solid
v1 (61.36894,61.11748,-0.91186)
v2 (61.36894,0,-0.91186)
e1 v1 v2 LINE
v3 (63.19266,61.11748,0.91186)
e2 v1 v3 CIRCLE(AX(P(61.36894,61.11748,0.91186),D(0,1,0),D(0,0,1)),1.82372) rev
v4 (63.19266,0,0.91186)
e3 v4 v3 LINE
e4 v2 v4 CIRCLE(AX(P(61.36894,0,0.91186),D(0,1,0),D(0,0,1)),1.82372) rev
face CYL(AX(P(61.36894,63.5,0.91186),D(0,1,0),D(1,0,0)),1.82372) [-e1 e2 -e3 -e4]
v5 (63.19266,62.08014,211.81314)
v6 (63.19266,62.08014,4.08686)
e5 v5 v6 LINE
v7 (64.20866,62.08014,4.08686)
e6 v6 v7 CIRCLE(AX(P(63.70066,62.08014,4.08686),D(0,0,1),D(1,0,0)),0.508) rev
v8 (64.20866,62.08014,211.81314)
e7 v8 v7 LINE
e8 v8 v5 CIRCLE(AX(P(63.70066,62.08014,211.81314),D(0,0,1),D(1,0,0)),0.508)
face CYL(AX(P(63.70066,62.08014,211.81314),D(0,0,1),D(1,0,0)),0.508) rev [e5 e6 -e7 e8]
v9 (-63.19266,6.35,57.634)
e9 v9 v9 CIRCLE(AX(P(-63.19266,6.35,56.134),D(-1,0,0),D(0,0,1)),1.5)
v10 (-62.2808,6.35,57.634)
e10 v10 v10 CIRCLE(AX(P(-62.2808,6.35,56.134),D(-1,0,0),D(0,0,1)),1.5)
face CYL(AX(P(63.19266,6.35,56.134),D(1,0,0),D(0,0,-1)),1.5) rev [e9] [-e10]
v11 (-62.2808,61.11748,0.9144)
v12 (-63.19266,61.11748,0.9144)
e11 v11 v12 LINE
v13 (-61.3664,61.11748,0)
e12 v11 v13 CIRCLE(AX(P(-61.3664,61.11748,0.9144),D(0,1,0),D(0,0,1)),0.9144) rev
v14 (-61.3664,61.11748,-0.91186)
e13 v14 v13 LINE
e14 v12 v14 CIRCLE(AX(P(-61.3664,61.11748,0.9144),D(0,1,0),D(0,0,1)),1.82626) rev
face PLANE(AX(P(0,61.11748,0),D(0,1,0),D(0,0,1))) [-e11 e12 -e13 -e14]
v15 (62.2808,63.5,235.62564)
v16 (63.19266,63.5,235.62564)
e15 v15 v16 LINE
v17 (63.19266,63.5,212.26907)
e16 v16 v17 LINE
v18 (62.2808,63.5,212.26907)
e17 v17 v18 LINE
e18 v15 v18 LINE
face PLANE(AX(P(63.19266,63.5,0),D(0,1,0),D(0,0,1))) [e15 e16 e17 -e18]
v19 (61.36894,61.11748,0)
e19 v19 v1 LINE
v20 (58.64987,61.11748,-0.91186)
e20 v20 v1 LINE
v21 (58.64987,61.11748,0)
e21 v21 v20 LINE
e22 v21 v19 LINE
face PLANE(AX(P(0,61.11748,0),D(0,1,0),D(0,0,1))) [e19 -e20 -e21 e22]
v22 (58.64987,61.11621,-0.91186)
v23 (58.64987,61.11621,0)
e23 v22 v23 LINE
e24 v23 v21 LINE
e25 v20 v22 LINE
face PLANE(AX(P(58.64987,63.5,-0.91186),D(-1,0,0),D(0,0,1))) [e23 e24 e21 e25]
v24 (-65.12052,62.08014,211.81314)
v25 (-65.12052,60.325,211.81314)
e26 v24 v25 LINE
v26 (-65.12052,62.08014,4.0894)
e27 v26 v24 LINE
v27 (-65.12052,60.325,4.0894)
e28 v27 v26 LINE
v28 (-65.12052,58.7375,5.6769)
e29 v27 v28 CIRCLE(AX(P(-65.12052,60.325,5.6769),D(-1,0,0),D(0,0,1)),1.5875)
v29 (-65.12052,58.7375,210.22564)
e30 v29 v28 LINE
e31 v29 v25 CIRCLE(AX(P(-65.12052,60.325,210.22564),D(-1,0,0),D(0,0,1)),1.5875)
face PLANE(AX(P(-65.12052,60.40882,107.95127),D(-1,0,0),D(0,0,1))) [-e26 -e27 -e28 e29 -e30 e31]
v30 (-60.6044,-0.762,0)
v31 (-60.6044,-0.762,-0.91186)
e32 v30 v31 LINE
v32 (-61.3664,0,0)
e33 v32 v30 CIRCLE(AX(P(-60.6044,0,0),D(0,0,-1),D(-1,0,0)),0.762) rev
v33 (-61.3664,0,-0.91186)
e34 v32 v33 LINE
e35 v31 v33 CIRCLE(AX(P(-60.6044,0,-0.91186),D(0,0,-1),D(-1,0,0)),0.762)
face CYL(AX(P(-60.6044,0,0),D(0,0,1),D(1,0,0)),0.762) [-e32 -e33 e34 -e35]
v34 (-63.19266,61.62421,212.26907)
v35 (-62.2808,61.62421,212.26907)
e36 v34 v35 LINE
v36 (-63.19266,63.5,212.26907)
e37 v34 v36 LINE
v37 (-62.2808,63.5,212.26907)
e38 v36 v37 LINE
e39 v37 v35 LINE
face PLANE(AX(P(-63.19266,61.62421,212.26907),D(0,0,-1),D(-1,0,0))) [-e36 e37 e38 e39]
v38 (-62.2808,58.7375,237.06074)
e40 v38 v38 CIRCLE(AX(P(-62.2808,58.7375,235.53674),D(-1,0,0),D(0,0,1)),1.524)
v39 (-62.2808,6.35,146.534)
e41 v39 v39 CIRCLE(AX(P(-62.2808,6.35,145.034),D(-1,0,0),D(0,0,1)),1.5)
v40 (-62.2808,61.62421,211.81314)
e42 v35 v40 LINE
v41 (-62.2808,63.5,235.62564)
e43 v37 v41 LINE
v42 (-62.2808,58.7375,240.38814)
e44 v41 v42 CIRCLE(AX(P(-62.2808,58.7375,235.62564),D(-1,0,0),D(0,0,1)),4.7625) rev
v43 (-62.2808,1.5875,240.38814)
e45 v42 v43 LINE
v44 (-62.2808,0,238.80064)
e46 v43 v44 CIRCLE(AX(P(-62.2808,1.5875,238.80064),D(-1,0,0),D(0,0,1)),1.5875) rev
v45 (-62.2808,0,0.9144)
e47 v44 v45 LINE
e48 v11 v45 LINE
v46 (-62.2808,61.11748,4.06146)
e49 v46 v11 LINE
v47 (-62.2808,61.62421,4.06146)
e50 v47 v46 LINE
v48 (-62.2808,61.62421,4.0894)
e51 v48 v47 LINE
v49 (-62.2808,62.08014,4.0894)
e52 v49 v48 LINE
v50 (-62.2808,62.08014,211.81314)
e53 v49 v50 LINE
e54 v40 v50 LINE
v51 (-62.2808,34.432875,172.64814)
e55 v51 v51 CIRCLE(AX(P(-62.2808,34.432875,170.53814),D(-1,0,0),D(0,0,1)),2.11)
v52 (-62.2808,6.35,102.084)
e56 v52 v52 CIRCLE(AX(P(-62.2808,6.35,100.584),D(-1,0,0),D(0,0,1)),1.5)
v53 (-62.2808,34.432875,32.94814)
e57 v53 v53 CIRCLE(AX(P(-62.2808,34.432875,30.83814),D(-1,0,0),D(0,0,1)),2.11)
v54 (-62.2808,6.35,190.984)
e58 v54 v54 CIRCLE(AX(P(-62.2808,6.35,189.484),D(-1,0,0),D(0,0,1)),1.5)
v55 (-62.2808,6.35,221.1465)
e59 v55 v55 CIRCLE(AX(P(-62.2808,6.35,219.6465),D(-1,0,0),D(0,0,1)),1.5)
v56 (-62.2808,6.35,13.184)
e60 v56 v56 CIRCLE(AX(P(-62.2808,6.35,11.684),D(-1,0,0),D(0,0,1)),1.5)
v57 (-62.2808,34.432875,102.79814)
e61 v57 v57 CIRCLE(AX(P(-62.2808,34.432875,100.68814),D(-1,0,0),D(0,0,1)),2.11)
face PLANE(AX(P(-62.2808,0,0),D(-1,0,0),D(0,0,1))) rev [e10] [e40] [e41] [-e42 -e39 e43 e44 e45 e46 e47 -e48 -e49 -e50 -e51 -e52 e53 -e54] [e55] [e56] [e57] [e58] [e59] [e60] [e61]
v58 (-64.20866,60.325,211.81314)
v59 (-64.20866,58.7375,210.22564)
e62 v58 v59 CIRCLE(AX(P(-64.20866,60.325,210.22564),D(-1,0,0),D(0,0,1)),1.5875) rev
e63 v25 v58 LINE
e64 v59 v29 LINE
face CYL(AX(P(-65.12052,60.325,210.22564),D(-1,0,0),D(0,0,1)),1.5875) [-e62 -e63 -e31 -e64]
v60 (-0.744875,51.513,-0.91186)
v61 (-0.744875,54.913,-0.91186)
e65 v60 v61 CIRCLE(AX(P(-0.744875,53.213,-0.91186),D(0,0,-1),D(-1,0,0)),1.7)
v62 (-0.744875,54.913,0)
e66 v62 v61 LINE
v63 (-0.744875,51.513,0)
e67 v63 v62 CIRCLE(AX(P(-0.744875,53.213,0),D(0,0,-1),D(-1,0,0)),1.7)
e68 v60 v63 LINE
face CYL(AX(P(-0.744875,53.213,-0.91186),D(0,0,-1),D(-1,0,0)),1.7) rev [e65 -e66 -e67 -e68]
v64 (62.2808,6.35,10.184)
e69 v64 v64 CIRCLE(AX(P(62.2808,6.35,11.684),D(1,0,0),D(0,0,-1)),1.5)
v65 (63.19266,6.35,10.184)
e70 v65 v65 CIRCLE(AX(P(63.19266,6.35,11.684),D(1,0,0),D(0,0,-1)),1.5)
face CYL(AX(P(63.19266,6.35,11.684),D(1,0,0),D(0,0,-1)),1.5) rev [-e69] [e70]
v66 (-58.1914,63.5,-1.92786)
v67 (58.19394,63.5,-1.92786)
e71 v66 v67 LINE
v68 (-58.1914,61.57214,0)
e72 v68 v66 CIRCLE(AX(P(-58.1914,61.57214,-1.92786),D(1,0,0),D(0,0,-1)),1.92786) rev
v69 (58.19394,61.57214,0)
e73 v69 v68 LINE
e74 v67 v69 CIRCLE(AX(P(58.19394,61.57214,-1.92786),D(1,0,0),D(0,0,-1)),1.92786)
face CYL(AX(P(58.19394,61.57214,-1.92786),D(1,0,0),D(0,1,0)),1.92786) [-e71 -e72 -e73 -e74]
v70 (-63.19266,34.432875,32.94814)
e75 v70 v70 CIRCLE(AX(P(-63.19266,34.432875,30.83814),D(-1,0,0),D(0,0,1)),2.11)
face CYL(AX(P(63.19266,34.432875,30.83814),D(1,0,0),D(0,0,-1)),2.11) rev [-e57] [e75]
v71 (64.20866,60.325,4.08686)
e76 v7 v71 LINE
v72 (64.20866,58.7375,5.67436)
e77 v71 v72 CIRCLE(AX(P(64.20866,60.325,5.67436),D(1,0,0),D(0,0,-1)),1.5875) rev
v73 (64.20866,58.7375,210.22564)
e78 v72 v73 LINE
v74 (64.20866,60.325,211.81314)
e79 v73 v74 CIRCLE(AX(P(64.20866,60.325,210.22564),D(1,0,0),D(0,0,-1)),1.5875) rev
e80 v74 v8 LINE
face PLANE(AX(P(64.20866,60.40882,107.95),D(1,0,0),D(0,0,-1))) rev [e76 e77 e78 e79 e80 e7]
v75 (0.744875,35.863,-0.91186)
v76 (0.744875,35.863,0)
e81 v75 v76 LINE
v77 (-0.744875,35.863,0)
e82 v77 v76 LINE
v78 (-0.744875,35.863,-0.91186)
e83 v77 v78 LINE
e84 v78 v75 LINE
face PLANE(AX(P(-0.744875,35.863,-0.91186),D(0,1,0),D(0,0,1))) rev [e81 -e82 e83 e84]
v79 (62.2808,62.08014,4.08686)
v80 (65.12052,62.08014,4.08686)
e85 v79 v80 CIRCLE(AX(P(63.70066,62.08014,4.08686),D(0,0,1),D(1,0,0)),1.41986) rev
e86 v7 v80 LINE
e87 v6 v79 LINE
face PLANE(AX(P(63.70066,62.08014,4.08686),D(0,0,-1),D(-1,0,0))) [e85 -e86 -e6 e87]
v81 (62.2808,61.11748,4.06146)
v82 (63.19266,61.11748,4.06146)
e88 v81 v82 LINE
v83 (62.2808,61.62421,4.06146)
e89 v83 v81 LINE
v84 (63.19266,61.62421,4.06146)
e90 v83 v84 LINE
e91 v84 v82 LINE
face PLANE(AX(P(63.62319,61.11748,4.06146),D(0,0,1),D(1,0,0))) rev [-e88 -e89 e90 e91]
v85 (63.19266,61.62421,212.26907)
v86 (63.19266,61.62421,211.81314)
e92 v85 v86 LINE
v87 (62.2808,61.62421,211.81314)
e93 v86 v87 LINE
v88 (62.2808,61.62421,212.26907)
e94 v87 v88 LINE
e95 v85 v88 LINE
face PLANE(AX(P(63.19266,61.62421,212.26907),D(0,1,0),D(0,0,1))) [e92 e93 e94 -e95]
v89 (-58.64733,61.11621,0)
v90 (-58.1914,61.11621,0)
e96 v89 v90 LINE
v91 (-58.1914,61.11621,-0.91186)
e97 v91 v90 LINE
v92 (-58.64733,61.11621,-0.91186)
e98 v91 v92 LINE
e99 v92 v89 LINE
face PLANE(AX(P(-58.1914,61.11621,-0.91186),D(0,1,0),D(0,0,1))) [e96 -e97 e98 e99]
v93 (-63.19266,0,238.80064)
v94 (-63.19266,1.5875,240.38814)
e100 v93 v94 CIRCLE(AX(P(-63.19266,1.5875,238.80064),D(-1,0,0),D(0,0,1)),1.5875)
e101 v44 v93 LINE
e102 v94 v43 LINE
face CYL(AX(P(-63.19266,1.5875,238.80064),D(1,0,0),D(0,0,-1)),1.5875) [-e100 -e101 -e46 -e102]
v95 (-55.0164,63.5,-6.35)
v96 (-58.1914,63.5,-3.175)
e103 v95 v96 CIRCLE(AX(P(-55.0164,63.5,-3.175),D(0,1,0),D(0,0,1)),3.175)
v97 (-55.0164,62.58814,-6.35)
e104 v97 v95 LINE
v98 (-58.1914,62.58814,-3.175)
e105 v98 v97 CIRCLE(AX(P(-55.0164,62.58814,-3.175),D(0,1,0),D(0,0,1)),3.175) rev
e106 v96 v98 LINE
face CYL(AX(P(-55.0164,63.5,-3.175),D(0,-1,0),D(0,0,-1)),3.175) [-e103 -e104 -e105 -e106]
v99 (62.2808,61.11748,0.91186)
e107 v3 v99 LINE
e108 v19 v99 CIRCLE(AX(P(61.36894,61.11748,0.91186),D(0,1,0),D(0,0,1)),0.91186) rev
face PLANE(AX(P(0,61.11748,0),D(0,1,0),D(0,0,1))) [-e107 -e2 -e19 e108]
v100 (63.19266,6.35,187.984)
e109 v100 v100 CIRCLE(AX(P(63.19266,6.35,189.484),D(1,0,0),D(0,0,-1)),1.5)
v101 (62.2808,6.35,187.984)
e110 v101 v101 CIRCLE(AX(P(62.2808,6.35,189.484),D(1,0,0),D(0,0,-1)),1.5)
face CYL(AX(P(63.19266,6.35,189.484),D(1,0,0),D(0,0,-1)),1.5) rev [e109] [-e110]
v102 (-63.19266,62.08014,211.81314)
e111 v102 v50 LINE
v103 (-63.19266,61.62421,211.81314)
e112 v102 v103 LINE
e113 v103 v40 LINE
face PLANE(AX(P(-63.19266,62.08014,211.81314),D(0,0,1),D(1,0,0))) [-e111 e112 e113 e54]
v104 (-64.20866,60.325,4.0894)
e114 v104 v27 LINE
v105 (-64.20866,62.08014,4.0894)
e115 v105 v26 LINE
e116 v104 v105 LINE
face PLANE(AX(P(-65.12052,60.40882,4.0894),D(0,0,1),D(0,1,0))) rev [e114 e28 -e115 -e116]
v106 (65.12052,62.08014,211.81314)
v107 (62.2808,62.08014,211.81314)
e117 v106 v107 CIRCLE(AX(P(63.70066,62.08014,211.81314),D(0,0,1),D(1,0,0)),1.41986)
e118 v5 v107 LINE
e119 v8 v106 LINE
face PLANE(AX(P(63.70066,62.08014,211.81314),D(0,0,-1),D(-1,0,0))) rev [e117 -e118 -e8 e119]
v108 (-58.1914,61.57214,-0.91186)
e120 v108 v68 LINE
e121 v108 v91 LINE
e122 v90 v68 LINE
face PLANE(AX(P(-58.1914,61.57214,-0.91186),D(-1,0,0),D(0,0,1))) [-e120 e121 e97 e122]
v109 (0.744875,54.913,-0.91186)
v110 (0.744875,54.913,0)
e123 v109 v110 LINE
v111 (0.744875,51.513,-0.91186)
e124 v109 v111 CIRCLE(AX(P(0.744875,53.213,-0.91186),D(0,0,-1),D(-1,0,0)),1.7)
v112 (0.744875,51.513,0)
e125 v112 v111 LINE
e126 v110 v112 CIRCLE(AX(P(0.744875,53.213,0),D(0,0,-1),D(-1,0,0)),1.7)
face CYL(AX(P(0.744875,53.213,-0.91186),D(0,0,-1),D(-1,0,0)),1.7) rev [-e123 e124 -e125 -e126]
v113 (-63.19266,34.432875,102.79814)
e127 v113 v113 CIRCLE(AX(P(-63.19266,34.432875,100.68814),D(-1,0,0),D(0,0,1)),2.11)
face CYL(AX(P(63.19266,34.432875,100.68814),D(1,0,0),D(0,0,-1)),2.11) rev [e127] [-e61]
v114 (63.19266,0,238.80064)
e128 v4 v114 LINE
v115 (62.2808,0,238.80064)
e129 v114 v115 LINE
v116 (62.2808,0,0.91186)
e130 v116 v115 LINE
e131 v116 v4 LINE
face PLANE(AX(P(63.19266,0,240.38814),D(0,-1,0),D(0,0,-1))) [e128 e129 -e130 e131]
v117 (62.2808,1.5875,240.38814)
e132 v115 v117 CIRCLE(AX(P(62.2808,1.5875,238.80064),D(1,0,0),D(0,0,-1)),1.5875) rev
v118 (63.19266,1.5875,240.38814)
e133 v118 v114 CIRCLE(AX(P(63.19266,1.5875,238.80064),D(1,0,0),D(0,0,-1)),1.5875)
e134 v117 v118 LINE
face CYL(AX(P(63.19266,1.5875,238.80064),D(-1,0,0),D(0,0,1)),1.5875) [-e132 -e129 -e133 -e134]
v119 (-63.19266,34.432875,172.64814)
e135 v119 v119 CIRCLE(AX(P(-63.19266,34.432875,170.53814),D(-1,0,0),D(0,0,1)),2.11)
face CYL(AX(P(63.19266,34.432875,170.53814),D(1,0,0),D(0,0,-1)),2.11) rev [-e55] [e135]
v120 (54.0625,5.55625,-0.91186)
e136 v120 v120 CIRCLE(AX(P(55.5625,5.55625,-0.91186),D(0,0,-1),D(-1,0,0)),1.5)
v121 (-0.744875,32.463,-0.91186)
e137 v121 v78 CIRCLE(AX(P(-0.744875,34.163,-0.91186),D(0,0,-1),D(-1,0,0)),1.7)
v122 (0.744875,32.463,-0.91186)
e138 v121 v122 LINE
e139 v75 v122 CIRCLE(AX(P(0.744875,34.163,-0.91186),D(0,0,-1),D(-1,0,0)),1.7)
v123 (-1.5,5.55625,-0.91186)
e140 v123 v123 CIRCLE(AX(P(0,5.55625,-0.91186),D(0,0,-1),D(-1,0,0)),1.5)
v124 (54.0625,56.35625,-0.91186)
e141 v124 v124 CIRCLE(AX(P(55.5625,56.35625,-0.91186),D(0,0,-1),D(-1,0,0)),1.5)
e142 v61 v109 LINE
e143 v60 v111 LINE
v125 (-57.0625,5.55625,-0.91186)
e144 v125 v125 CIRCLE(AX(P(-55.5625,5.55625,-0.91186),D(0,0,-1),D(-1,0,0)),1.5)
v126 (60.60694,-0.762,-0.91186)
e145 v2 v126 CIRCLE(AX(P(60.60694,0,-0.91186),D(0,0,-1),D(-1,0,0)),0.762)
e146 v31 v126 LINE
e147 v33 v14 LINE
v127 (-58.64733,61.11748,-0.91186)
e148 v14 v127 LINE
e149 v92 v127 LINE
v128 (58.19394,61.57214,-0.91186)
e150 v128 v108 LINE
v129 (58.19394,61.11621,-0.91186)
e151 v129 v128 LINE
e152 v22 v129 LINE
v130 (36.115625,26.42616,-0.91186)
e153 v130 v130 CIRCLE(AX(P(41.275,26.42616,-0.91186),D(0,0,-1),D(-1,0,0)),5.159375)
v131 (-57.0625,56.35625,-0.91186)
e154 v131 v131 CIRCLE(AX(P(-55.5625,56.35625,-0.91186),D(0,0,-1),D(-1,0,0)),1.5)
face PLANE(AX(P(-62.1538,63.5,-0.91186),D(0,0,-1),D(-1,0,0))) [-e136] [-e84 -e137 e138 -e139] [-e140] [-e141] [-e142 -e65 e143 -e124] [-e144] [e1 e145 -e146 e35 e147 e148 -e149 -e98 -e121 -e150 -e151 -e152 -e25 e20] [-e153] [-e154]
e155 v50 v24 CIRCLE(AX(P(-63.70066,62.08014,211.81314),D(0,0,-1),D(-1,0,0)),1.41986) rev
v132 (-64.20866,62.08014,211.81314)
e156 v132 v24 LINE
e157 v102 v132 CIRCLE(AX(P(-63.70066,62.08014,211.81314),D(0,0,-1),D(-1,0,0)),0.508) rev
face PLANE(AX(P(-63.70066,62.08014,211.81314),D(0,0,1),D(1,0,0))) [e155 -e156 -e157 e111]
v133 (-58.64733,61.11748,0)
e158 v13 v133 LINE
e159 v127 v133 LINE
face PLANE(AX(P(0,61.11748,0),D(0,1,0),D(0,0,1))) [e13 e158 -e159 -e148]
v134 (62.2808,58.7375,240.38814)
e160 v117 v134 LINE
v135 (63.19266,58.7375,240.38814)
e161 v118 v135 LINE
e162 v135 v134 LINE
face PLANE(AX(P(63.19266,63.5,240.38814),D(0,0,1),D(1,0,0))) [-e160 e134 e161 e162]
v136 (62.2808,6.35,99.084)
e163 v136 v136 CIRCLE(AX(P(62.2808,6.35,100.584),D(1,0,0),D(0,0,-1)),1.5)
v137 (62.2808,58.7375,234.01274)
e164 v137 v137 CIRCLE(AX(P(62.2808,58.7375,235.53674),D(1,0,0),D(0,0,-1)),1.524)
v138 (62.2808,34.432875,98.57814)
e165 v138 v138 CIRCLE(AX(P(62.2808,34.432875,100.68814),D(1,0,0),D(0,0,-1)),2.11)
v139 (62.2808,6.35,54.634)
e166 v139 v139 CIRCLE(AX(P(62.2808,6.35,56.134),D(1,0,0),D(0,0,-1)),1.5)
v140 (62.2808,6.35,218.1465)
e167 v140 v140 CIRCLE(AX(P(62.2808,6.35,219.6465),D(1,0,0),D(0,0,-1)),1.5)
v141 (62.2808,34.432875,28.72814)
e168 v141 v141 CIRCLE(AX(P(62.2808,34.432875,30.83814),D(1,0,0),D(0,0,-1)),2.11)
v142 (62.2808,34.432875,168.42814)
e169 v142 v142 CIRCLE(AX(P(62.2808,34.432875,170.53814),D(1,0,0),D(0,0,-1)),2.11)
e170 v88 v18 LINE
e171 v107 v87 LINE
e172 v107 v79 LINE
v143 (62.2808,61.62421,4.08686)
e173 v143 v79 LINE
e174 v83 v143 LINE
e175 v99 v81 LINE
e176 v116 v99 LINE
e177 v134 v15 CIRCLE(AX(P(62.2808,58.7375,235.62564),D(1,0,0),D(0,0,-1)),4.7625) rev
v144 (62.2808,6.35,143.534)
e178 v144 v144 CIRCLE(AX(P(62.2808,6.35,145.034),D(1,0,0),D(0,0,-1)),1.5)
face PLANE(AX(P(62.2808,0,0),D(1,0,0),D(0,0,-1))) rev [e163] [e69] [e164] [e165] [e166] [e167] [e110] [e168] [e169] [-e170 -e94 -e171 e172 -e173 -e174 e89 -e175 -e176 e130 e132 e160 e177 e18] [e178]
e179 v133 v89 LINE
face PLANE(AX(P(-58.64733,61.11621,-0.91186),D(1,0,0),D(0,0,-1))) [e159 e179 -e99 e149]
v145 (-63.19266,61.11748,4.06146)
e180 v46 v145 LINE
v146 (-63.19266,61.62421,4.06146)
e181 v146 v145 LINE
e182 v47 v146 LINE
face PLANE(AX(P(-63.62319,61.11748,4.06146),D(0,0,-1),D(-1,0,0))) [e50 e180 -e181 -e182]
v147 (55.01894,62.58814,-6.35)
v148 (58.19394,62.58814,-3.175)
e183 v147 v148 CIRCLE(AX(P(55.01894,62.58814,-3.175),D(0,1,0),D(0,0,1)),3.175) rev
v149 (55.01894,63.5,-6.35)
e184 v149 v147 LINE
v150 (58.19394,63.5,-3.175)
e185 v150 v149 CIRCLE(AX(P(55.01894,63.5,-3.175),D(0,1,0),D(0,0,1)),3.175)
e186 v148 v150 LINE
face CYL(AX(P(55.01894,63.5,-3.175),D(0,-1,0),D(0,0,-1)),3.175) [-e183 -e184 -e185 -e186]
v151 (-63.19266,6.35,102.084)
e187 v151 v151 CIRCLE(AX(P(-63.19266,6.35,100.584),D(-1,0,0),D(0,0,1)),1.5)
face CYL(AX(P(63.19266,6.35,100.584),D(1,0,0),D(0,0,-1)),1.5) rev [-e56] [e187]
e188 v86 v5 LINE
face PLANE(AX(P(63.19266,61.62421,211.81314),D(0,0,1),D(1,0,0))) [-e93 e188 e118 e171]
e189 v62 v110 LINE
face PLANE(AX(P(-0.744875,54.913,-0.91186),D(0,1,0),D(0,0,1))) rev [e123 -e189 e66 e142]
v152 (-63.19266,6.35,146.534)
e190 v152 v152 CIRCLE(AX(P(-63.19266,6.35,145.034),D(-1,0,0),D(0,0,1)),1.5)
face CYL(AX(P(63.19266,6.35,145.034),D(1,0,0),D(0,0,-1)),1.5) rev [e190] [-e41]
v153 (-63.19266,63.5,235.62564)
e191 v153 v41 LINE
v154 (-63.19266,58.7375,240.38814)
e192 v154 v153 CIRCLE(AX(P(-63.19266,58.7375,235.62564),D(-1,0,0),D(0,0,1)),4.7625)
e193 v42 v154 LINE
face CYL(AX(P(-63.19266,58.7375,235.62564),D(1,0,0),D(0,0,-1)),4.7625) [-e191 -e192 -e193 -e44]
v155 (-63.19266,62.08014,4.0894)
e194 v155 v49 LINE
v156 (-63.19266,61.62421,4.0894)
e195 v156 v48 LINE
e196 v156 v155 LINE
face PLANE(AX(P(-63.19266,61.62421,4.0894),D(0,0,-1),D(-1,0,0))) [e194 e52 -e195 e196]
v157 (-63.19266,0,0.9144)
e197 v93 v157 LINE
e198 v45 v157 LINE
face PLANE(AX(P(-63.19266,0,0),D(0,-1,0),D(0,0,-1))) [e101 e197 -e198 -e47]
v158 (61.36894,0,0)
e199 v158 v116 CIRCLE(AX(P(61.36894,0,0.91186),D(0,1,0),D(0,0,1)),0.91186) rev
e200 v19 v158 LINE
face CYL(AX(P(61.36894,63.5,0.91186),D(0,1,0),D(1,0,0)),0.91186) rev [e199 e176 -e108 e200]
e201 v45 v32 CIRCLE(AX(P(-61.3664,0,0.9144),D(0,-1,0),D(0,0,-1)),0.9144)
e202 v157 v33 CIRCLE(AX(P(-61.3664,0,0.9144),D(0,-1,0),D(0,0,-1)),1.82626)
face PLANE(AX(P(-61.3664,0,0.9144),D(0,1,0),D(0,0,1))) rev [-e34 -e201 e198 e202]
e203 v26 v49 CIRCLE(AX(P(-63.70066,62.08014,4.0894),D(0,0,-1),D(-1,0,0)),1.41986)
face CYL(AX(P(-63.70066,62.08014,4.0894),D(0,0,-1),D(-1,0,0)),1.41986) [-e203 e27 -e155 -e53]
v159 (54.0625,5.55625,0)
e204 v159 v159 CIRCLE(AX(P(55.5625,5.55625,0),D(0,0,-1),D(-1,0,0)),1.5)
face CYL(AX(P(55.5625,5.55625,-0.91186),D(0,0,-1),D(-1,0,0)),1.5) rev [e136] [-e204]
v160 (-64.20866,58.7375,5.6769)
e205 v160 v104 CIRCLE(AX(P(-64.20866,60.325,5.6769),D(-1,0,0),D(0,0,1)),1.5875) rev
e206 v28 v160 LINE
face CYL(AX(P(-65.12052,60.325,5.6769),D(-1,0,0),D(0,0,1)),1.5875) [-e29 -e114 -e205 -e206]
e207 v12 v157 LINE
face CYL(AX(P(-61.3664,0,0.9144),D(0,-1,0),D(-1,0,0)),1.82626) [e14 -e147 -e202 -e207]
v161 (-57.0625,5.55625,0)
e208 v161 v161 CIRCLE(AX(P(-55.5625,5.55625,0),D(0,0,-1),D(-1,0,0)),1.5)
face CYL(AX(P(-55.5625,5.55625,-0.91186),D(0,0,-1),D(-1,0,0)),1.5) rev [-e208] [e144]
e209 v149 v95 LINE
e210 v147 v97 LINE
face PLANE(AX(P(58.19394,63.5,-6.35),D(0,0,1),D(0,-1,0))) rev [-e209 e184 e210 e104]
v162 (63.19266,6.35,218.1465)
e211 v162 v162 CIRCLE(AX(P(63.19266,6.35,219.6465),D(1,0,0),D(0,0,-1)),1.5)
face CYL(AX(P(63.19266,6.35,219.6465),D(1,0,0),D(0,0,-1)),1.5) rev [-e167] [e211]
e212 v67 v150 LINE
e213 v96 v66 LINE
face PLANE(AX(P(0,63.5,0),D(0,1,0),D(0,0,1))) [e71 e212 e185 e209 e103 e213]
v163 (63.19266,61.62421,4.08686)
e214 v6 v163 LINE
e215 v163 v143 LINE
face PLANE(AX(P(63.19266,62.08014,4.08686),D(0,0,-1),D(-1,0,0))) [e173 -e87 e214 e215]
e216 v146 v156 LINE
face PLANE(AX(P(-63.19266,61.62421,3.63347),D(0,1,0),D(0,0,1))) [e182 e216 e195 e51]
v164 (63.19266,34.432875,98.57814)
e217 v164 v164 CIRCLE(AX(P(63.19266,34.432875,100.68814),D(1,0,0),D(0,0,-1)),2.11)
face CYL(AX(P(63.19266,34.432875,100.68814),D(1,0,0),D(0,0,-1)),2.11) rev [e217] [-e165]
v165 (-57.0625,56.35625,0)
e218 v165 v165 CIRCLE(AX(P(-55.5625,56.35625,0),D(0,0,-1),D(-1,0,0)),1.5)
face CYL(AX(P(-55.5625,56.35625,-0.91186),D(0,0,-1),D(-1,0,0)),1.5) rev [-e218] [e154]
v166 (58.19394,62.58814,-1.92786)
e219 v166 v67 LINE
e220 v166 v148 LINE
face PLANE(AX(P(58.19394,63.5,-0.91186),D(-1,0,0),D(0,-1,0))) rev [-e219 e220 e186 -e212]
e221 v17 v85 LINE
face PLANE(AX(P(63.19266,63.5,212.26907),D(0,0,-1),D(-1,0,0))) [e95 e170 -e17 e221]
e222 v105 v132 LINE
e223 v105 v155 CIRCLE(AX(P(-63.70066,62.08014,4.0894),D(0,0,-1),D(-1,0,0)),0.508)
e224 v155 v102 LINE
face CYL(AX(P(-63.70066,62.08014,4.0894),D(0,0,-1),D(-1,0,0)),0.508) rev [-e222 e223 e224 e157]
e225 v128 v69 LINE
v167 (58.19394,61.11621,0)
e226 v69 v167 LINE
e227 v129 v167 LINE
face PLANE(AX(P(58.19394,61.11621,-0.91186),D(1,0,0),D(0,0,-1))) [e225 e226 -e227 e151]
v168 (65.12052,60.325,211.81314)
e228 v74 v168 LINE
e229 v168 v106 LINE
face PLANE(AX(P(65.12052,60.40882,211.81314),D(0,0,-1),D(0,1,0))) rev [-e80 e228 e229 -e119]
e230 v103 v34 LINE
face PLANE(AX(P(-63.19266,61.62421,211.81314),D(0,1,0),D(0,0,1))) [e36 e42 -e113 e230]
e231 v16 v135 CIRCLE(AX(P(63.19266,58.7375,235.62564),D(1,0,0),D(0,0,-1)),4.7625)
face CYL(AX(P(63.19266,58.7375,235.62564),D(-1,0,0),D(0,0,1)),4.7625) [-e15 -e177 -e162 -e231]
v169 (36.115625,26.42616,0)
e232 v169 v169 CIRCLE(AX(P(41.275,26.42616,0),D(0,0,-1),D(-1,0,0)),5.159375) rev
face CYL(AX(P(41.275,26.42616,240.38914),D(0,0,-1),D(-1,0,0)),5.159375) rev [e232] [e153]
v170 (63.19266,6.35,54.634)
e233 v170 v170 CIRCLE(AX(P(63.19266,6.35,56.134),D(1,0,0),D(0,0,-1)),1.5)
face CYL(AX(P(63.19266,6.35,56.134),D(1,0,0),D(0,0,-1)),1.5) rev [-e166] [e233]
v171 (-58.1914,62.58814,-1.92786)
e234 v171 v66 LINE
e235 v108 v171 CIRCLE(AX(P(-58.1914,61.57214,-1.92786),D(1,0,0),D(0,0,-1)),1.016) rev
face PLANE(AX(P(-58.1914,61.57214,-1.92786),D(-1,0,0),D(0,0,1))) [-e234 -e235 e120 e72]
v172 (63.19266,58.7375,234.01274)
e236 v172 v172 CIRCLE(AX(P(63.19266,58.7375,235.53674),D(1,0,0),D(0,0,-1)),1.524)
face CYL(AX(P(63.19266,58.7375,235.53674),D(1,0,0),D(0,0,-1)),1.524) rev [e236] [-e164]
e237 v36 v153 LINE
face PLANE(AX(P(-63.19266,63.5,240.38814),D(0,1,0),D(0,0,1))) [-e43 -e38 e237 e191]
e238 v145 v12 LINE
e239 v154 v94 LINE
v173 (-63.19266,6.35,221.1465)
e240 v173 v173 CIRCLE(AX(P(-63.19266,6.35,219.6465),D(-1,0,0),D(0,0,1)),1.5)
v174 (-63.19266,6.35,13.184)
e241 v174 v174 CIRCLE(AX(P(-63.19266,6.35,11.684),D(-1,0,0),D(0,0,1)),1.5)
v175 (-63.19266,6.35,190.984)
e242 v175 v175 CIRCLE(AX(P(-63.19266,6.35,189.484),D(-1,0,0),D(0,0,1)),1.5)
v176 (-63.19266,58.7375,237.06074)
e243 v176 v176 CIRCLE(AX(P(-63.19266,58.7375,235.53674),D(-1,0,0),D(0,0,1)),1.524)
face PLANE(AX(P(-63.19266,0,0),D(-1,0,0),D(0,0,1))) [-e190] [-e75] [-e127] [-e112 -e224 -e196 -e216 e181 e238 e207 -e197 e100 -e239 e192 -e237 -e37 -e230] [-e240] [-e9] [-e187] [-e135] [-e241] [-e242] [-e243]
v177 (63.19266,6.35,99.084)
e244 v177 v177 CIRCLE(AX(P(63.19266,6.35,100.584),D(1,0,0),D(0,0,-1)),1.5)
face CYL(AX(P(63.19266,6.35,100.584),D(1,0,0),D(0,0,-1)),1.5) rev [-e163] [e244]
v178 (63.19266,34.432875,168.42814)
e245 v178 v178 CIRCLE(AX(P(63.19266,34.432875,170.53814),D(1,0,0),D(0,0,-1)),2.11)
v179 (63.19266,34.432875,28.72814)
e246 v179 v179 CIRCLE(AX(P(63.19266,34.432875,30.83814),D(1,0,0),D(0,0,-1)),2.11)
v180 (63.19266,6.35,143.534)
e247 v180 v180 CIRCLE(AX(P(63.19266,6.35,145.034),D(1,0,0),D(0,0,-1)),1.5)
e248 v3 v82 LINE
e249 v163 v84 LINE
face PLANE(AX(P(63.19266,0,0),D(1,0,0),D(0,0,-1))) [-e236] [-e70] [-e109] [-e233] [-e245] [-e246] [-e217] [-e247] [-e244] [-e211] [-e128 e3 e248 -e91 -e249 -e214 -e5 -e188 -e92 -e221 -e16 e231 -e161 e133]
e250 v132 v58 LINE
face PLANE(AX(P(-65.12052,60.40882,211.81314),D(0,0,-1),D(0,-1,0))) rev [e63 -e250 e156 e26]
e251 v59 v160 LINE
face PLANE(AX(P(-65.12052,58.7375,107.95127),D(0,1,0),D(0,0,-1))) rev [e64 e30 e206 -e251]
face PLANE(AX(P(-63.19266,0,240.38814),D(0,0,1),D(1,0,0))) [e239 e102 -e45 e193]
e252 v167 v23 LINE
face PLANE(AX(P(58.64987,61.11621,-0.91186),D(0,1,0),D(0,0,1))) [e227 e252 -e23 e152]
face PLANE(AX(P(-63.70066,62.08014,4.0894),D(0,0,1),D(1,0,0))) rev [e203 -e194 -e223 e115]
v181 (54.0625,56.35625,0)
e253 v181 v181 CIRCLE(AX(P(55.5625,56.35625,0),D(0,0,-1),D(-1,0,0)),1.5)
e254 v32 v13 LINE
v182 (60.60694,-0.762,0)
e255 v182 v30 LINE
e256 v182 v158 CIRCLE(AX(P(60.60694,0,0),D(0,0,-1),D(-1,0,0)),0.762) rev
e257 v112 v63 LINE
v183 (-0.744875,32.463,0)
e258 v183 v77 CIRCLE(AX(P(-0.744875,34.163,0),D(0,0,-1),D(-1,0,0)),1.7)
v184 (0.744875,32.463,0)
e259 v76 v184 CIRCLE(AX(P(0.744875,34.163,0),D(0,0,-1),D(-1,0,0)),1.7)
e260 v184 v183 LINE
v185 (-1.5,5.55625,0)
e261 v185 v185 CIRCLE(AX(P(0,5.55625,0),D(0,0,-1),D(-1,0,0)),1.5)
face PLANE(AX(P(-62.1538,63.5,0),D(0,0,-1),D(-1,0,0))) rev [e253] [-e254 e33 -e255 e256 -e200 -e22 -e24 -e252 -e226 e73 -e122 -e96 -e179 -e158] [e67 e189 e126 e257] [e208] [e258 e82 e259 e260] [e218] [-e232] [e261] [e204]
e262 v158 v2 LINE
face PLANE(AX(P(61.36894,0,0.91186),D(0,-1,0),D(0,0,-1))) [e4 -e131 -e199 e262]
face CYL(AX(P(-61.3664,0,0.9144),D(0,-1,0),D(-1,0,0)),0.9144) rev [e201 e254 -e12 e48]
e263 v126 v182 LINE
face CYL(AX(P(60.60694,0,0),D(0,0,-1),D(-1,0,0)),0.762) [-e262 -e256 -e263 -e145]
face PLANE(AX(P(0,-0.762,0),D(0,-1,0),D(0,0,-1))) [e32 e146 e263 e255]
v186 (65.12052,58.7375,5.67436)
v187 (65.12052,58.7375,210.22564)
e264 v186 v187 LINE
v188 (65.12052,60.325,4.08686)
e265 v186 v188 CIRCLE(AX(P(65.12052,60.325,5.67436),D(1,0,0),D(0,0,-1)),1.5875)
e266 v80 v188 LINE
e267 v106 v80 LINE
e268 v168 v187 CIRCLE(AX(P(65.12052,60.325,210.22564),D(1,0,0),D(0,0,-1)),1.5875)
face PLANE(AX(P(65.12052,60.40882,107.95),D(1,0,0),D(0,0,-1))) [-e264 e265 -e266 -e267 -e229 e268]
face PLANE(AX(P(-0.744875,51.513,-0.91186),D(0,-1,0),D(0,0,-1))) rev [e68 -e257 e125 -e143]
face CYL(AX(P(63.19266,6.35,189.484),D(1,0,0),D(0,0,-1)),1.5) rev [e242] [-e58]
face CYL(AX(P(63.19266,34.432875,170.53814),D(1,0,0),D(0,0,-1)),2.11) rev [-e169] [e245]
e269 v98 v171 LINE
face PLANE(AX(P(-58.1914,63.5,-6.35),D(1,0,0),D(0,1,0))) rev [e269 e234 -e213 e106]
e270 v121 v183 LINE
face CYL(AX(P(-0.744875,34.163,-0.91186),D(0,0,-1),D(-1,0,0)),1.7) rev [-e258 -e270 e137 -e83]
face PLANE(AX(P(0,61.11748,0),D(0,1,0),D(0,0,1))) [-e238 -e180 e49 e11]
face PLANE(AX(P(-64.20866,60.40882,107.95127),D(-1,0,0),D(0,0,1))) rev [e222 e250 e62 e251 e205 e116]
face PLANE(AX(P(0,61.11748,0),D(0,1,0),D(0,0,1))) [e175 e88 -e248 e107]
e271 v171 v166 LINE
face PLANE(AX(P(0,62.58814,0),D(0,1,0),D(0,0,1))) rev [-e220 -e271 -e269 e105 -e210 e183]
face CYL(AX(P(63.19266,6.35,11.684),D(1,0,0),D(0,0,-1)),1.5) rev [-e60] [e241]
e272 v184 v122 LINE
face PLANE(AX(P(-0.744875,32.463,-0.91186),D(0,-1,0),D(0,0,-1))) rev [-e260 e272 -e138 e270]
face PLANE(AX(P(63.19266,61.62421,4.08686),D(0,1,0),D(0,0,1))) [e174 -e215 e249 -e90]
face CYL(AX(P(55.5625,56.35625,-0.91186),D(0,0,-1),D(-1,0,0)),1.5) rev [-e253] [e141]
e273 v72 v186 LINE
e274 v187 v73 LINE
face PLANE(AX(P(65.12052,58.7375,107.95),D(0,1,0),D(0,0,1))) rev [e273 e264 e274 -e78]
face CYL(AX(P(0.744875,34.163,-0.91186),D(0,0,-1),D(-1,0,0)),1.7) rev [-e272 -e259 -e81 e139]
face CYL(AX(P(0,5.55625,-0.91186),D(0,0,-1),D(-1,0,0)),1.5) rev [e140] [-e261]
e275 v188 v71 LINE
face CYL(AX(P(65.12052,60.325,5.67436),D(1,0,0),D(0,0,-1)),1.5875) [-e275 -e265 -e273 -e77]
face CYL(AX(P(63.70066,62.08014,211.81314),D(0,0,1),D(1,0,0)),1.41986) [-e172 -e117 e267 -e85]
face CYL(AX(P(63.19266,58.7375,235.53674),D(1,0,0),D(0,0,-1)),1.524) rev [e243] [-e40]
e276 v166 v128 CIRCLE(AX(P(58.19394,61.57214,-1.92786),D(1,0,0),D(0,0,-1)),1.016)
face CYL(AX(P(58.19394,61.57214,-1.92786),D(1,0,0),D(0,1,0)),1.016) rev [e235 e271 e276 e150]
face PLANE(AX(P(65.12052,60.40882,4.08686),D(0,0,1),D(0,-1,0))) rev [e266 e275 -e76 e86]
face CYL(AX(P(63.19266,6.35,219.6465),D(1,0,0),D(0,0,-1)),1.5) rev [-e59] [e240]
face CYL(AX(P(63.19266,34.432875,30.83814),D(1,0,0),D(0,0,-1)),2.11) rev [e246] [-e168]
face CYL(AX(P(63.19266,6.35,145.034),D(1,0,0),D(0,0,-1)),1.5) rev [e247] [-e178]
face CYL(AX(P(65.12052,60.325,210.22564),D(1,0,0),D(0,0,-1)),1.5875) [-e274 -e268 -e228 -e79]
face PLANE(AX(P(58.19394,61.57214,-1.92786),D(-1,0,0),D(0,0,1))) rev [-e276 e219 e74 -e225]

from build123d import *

# Parameters (mm, degrees)
SKETCH1_W                                 = 124.3076
SKETCH1_H                                 = 0.91186
BASE_FLANGE1_DEPTH                        = 63.5
EDGE_FLANGE2_STRIP_W                      = 5.59816
EDGE_FLANGE2_STRIP_H                      = 0.91186
EDGE_FLANGE2_STRIP_CUT_DEPTH              = 63.5
EDGE_FLANGE2_DEPTH                        = 63.5
EDGE_FLANGE3_STRIP_W                      = 5.60324
EDGE_FLANGE3_STRIP_H                      = 0.91186
EDGE_FLANGE3_STRIP_CUT_DEPTH              = 63.5
EDGE_FLANGE3_DEPTH                        = 63.5
HEM1_START                                = 3.63347
HEM1_DEPTH                                = 208.6356
HEM1_2_DEPTH                              = 0.45593
HEM1_START_2                              = 211.81314
HEM1_3_DEPTH                              = 0.45593
HEM1_START_3                              = 4.0894
HEM1_4_DEPTH                              = 207.72374
HEM2_START                                = 3.63093
HEM2_DEPTH                                = 208.63814
HEM2_2_DEPTH                              = 0.45593
HEM2_START_2                              = 211.81314
HEM2_3_DEPTH                              = 0.45593
HEM2_START_3                              = 4.08686
HEM2_4_DEPTH                              = 207.72628
EDGE_FLANGE4_STRIP_W                      = 5.67944
EDGE_FLANGE4_STRIP_H                      = 0.91186
EDGE_FLANGE4_STRIP_CUT_DEPTH              = 116.38534
EDGE_FLANGE4_RELIEF_W                     = 6.13537
EDGE_FLANGE4_RELIEF_H                     = 0.45593
EDGE_FLANGE4_RELIEF_CUT_DEPTH             = 0.91186
EDGE_FLANGE4_DEPTH                        = 116.38534
M3_START                                  = -0.91186
M3_CLEARANCE_SLOT1_DEPTH                  = 0.91186
F_1_8_0_125_DIAMETER_HOLE1_D              = 3.048
F_3_0MM_DOWEL_HOLE1_D                     = 3
FILLET2_R                                 = 3.175
FILLET3_R                                 = 4.7625
FILLET5_R                                 = 1.5875
SKETCH92_W                                = 122.73534
SKETCH92_H                                = 0.91186
BOSS_EXTRUDE1_DEPTH                       = 0.762
FILLET6_R                                 = 0.762
FILLET7_R                                 = 1.5875
HOLE_FOR_M3_FLUSH_HEAD_STUDS_FH_FHS_FHA_D = 3
HOLE_FOR_M2_5_TS_STANDOFFS_TSO_TSOS_TSO_D = 4.22
SKETCH103_W                               = 5.17525
SKETCH103_H                               = 5.17525
CUT_EXTRUDE4_DEPTH                        = 2.38252
AIR_FITTING_RELIEF_REACH                  = 259.873
SKETCH106_R                               = 5.159375


# Read off the part's stored shape, not the designer's step: Hem1, Hem2, M3 Clearance Slot1
# Sheet-metal steps are written as plain solids
with BuildPart() as part:
    # Sketch1 → Base-Flange1 (new body)
    with BuildSketch(Plane(origin=(0, 0, 0), x_dir=(1, 0, 0), z_dir=(0, 1, 0))):
        with Locations((0, 0.45593)):
            Rectangle(SKETCH1_W, SKETCH1_H)
    extrude(amount=BASE_FLANGE1_DEPTH)

    # Edge-Flange2 strip (across the edge) → Edge-Flange2 strip cut (cut)
    with BuildSketch(Plane(origin=(62.2808, 0, 0), x_dir=(-1, 0, 0), z_dir=(0, 1, 0))):
        with Locations((-1.88722, -0.45593)):
            Rectangle(EDGE_FLANGE2_STRIP_W, EDGE_FLANGE2_STRIP_H)
    extrude(amount=EDGE_FLANGE2_STRIP_CUT_DEPTH, mode=Mode.SUBTRACT)

    # Edge-Flange2 section (across the edge) → Edge-Flange2 (add)
    with BuildSketch(Plane(origin=(62.2808, 0, 0), x_dir=(-1, 0, 0), z_dir=(0, 1, 0))):
        with BuildLine():
            Line((-0.91186, 0.91186), (-0.91186, 240.38814))
            Line((-0.91186, 240.38814), (0, 240.38814))
            Line((0, 240.38814), (0, 0.91186))
            ThreePointArc((0, 0.91186), (0.267077611, 0.267077611), (0.91186, 0))
            Line((0.91186, 0), (0.91186, -0.91186))
            ThreePointArc((0.91186, -0.91186), (-0.377704779, -0.377704779), (-0.91186, 0.91186))
        make_face()
    extrude(amount=EDGE_FLANGE2_DEPTH)

    # Edge-Flange3 strip (across the edge) → Edge-Flange3 strip cut (cut)
    with BuildSketch(Plane(origin=(-62.2808, 63.5, 0), x_dir=(1, 0, 0), z_dir=(0, -1, 0))):
        with Locations((-1.88722, -0.45593)):
            Rectangle(EDGE_FLANGE3_STRIP_W, EDGE_FLANGE3_STRIP_H)
    extrude(amount=EDGE_FLANGE3_STRIP_CUT_DEPTH, mode=Mode.SUBTRACT)

    # Edge-Flange3 section (across the edge) → Edge-Flange3 (add)
    with BuildSketch(Plane(origin=(-62.2808, 63.5, 0), x_dir=(1, 0, 0), z_dir=(0, -1, 0))):
        with BuildLine():
            Line((-0.91186, 0.9144), (-0.91186, 240.38814))
            Line((-0.91186, 240.38814), (0, 240.38814))
            Line((0, 240.38814), (0, 0.9144))
            ThreePointArc((0, 0.9144), (0.267821559, 0.267821559), (0.9144, 0))
            Line((0.9144, 0), (0.9144, -0.91186))
            ThreePointArc((0.9144, -0.91186), (-0.37696083, -0.37696083), (-0.91186, 0.9144))
        make_face()
    extrude(amount=EDGE_FLANGE3_DEPTH)

    # Hem1 outline → Hem1 (cut)
    with BuildSketch(Plane.XY.offset(HEM1_START)):
        with BuildLine():
            ThreePointArc((-63.19266, 63.406012701), (-62.530768702, 62.884724843), (-62.2808, 62.08014))
            Line((-62.2808, 62.08014), (-62.2808, 63.5))
            Line((-62.2808, 63.5), (-63.19266, 63.5))
            Line((-63.19266, 63.5), (-63.19266, 63.406012701))
        make_face()
    extrude(amount=HEM1_DEPTH, mode=Mode.SUBTRACT)

    # Hem1 2 outline → Hem1 2 (cut)
    with BuildSketch(Plane.XY.offset(HEM1_START)):
        with BuildLine():
            Line((-63.19266, 61.62421), (-62.2808, 61.62421))
            Line((-62.2808, 61.62421), (-62.2808, 62.08014))
            ThreePointArc((-62.2808, 62.08014), (-62.530768702, 62.884724843), (-63.19266, 63.406012701))
            Line((-63.19266, 63.406012701), (-63.19266, 61.62421))
        make_face()
    extrude(amount=HEM1_2_DEPTH, mode=Mode.SUBTRACT)

    # Hem1 3 outline → Hem1 3 (cut)
    with BuildSketch(Plane.XY.offset(HEM1_START_2)):
        with BuildLine():
            Line((-63.19266, 61.62421), (-62.2808, 61.62421))
            Line((-62.2808, 61.62421), (-62.2808, 62.08014))
            ThreePointArc((-62.2808, 62.08014), (-62.530768702, 62.884724843), (-63.19266, 63.406012701))
            Line((-63.19266, 63.406012701), (-63.19266, 61.62421))
        make_face()
    extrude(amount=HEM1_3_DEPTH, mode=Mode.SUBTRACT)

    # Hem1 4 outline → Hem1 4 (add)
    with BuildSketch(Plane.XY.offset(HEM1_START_3)):
        with BuildLine():
            ThreePointArc((-64.20866, 62.08014), (-63.70066, 62.58814), (-63.19266, 62.08014))
            Line((-63.19266, 62.08014), (-63.19266, 63.406012701))
            ThreePointArc((-63.19266, 63.406012701), (-64.505244843, 63.250031298), (-65.12052, 62.08014))
            Line((-65.12052, 62.08014), (-65.12052, 58.7375))
            Line((-65.12052, 58.7375), (-64.20866, 58.7375))
            Line((-64.20866, 58.7375), (-64.20866, 62.08014))
        make_face()
    extrude(amount=HEM1_4_DEPTH)

    # Hem2 outline → Hem2 (cut)
    with BuildSketch(Plane.XY.offset(HEM2_START)):
        with BuildLine():
            Line((62.2808, 63.5), (62.2808, 62.08014))
            ThreePointArc((62.2808, 62.08014), (62.530768702, 62.884724843), (63.19266, 63.406012701))
            Line((63.19266, 63.406012701), (63.19266, 63.5))
            Line((63.19266, 63.5), (62.2808, 63.5))
        make_face()
    extrude(amount=HEM2_DEPTH, mode=Mode.SUBTRACT)

    # Hem2 2 outline → Hem2 2 (cut)
    with BuildSketch(Plane.XY.offset(HEM2_START)):
        with BuildLine():
            Line((62.2808, 61.62421), (63.19266, 61.62421))
            Line((63.19266, 61.62421), (63.19266, 63.406012701))
            ThreePointArc((63.19266, 63.406012701), (62.530768702, 62.884724843), (62.2808, 62.08014))
            Line((62.2808, 62.08014), (62.2808, 61.62421))
        make_face()
    extrude(amount=HEM2_2_DEPTH, mode=Mode.SUBTRACT)

    # Hem2 3 outline → Hem2 3 (cut)
    with BuildSketch(Plane.XY.offset(HEM2_START_2)):
        with BuildLine():
            Line((62.2808, 61.62421), (63.19266, 61.62421))
            Line((63.19266, 61.62421), (63.19266, 63.406012701))
            ThreePointArc((63.19266, 63.406012701), (62.530768702, 62.884724843), (62.2808, 62.08014))
            Line((62.2808, 62.08014), (62.2808, 61.62421))
        make_face()
    extrude(amount=HEM2_3_DEPTH, mode=Mode.SUBTRACT)

    # Hem2 4 outline → Hem2 4 (add)
    with BuildSketch(Plane.XY.offset(HEM2_START_3)):
        with BuildLine():
            Line((63.19266, 63.406012701), (63.19266, 62.08014))
            ThreePointArc((63.19266, 62.08014), (63.70066, 62.58814), (64.20866, 62.08014))
            Line((64.20866, 62.08014), (64.20866, 58.7375))
            Line((64.20866, 58.7375), (65.12052, 58.7375))
            Line((65.12052, 58.7375), (65.12052, 62.08014))
            ThreePointArc((65.12052, 62.08014), (64.505244843, 63.250031298), (63.19266, 63.406012701))
        make_face()
    extrude(amount=HEM2_4_DEPTH)

    # Edge-Flange4 strip (across the edge) → Edge-Flange4 strip cut (cut)
    with BuildSketch(Plane(origin=(-58.1914, 63.5, -0.91186), x_dir=(0, -1, 0), z_dir=(1, 0, 0))):
        with Locations((-0.91186, -0.45593)):
            Rectangle(EDGE_FLANGE4_STRIP_W, EDGE_FLANGE4_STRIP_H)
    extrude(amount=EDGE_FLANGE4_STRIP_CUT_DEPTH, mode=Mode.SUBTRACT)

    # Edge-Flange4 relief (on the sheet) → Edge-Flange4 relief cut (cut)
    with BuildSketch(Plane(origin=(-58.1914, 61.57214, -0.91186), x_dir=(0, -1, 0), z_dir=(0, 0, -1))):
        with Locations((-2.611755, 0.227965)):
            Rectangle(EDGE_FLANGE4_RELIEF_W, EDGE_FLANGE4_RELIEF_H)
        with Locations((-2.611755, -116.613305)):
            Rectangle(EDGE_FLANGE4_RELIEF_W, EDGE_FLANGE4_RELIEF_H)
    extrude(amount=-EDGE_FLANGE4_RELIEF_CUT_DEPTH, mode=Mode.SUBTRACT)

    # Edge-Flange4 section (across the edge) → Edge-Flange4 (add)
    with BuildSketch(Plane(origin=(-58.1914, 63.5, -0.91186), x_dir=(0, -1, 0), z_dir=(1, 0, 0))):
        with BuildLine():
            Line((0, 1.016), (0, 5.43814))
            Line((0, 5.43814), (0.91186, 5.43814))
            Line((0.91186, 5.43814), (0.91186, 1.016))
            ThreePointArc((0.91186, 1.016), (1.20943951, 0.29757951), (1.92786, 0))
            Line((1.92786, 0), (1.92786, -0.91186))
            ThreePointArc((1.92786, -0.91186), (0.564657121, -0.347202879), (0, 1.016))
        make_face()
    extrude(amount=EDGE_FLANGE4_DEPTH)

    # M3 Clearance Slot1 outline → M3 Clearance Slot1 (cut)
    with BuildSketch(Plane.XY.offset(M3_START)):
        with BuildLine():
            ThreePointArc((0.744874968, 32.463), (2.444874968, 34.163), (0.744874968, 35.863))
            Line((0.744874968, 35.863), (-0.744874968, 35.863))
            ThreePointArc((-0.744874968, 35.863), (-2.444874968, 34.163), (-0.744874968, 32.463))
            Line((-0.744874968, 32.463), (0.744874968, 32.463))
        make_face()
        with BuildLine():
            ThreePointArc((0.744874968, 51.513), (2.444874968, 53.213), (0.744874968, 54.913))
            Line((0.744874968, 54.913), (-0.744874968, 54.913))
            ThreePointArc((-0.744874968, 54.913), (-2.444874968, 53.213), (-0.744874968, 51.513))
            Line((-0.744874968, 51.513), (0.744874968, 51.513))
        make_face()
    extrude(amount=M3_CLEARANCE_SLOT1_DEPTH, mode=Mode.SUBTRACT)

    # 1/8 (0.125) Diameter Hole1 (through all)
    with Locations(Plane(origin=(63.19266, 0, 0), x_dir=(0, 0, -1), z_dir=(1, 0, 0))):
        with Locations((-235.53674, 58.7375)):
            Hole(F_1_8_0_125_DIAMETER_HOLE1_D / 2)

    # Ø3.0mm Dowel Hole1 (through all)
    with Locations(Plane(origin=(63.19266, 0, 0), x_dir=(0, 0, -1), z_dir=(1, 0, 0))):
        with Locations((-189.484, 6.35), (-100.584, 6.35), (-11.684, 6.35), (-145.034, 6.35), (-56.134, 6.35), (-219.6465, 6.35)):
            Hole(F_3_0MM_DOWEL_HOLE1_D / 2)

    # Fillet2
    fillet2_edges = [part.edges().sort_by_distance(p)[0] for p in [
        (-58.1914, 63.04407, -6.35),
        (58.19394, 63.04407, -6.35),
    ]]
    fillet(fillet2_edges, radius=FILLET2_R)

    # Fillet3
    fillet3_edges = [part.edges().sort_by_distance(p)[0] for p in [
        (62.73673, 63.5, 240.38814),
        (-62.73673, 63.5, 240.38814),
    ]]
    fillet(fillet3_edges, radius=FILLET3_R)

    # Fillet5
    fillet5_edges = [part.edges().sort_by_distance(p)[0] for p in [
        (62.73673, 0, 240.38814),
        (-62.73673, 0, 240.38814),
    ]]
    fillet(fillet5_edges, radius=FILLET5_R)

    # Sketch92 → Boss-Extrude1 (add)
    with BuildSketch(Plane.XZ):
        with Locations((0.00127, -0.45593)):
            Rectangle(SKETCH92_W, SKETCH92_H)
    extrude(amount=BOSS_EXTRUDE1_DEPTH)

    # Fillet6
    fillet6_edges = [part.edges().sort_by_distance(p)[0] for p in [
        (-61.3664, -0.762, -0.45593),
        (61.36894, -0.762, -0.45593),
    ]]
    fillet(fillet6_edges, radius=FILLET6_R - 0.0001)  # a hair under: the kernel refuses the full size

    # Fillet7
    fillet7_edges = [part.edges().sort_by_distance(p)[0] for p in [
        (-64.66459, 58.7375, 4.0894),
        (-64.66459, 58.7375, 211.81314),
        (64.66459, 58.7375, 211.81314),
        (64.66459, 58.7375, 4.08686),
    ]]
    fillet(fillet7_edges, radius=FILLET7_R)

    # Hole for M3 Flush head Studs (FH,FHS,FHA,FH4)1 (through all)
    with Locations(Plane(origin=(0, 0, -0.91186), x_dir=(-1, 0, 0), z_dir=(0, 0, -1))):
        with Locations((-55.5625, 56.35625), (-55.5625, 5.55625), (0, 5.55625), (55.5625, 56.35625), (55.5625, 5.55625)):
            Hole(HOLE_FOR_M3_FLUSH_HEAD_STUDS_FH_FHS_FHA_D / 2)

    # Hole for M2.5 TS Standoffs (TSO,TSOS,TSOA,TSO4)1 (through all)
    with Locations(Plane(origin=(63.19266, 0, 0), x_dir=(0, 0, -1), z_dir=(1, 0, 0))):
        with Locations((-170.53814, 34.432875), (-100.68814, 34.432875), (-30.83814, 34.432875)):
            Hole(HOLE_FOR_M2_5_TS_STANDOFFS_TSO_TSOS_TSO_D / 2)

    # Sketch103 → Cut-Extrude4 (cut)
    with BuildSketch(Plane(origin=(0, 63.5, 0), x_dir=(1, 0, 0), z_dir=(0, 1, 0))):
        with Locations((61.035565, -1.473835)):
            Rectangle(SKETCH103_W, SKETCH103_H)
    cut_extrude4 = extrude(amount=-CUT_EXTRUDE4_DEPTH, mode=Mode.SUBTRACT)

    # Mirror1: Cut-Extrude4 across plane
    add(cut_extrude4.mirror(Plane(origin=(0, 0, 0), x_dir=(0, 0, 1), z_dir=(1, 0, 0))), mode=Mode.SUBTRACT)

    # Sketch106 → air fitting relief (cut, up to next)
    with BuildSketch(Plane(origin=(0, 0, -0.91186), x_dir=(-1, 0, 0), z_dir=(0, 0, -1)), mode=Mode.PRIVATE) as air_fitting_relief_sk1:
        with Locations((-41.275, 26.42616)):
            Circle(SKETCH106_R)
    air_fitting_relief_tool1 = extrude(air_fitting_relief_sk1.sketch, amount=-AIR_FITTING_RELIEF_REACH, mode=Mode.PRIVATE) & part.part
    add(air_fitting_relief_tool1.solids().sort_by_distance((41.275, 26.42616, -0.91186))[0], mode=Mode.SUBTRACT)


solid = part.part
